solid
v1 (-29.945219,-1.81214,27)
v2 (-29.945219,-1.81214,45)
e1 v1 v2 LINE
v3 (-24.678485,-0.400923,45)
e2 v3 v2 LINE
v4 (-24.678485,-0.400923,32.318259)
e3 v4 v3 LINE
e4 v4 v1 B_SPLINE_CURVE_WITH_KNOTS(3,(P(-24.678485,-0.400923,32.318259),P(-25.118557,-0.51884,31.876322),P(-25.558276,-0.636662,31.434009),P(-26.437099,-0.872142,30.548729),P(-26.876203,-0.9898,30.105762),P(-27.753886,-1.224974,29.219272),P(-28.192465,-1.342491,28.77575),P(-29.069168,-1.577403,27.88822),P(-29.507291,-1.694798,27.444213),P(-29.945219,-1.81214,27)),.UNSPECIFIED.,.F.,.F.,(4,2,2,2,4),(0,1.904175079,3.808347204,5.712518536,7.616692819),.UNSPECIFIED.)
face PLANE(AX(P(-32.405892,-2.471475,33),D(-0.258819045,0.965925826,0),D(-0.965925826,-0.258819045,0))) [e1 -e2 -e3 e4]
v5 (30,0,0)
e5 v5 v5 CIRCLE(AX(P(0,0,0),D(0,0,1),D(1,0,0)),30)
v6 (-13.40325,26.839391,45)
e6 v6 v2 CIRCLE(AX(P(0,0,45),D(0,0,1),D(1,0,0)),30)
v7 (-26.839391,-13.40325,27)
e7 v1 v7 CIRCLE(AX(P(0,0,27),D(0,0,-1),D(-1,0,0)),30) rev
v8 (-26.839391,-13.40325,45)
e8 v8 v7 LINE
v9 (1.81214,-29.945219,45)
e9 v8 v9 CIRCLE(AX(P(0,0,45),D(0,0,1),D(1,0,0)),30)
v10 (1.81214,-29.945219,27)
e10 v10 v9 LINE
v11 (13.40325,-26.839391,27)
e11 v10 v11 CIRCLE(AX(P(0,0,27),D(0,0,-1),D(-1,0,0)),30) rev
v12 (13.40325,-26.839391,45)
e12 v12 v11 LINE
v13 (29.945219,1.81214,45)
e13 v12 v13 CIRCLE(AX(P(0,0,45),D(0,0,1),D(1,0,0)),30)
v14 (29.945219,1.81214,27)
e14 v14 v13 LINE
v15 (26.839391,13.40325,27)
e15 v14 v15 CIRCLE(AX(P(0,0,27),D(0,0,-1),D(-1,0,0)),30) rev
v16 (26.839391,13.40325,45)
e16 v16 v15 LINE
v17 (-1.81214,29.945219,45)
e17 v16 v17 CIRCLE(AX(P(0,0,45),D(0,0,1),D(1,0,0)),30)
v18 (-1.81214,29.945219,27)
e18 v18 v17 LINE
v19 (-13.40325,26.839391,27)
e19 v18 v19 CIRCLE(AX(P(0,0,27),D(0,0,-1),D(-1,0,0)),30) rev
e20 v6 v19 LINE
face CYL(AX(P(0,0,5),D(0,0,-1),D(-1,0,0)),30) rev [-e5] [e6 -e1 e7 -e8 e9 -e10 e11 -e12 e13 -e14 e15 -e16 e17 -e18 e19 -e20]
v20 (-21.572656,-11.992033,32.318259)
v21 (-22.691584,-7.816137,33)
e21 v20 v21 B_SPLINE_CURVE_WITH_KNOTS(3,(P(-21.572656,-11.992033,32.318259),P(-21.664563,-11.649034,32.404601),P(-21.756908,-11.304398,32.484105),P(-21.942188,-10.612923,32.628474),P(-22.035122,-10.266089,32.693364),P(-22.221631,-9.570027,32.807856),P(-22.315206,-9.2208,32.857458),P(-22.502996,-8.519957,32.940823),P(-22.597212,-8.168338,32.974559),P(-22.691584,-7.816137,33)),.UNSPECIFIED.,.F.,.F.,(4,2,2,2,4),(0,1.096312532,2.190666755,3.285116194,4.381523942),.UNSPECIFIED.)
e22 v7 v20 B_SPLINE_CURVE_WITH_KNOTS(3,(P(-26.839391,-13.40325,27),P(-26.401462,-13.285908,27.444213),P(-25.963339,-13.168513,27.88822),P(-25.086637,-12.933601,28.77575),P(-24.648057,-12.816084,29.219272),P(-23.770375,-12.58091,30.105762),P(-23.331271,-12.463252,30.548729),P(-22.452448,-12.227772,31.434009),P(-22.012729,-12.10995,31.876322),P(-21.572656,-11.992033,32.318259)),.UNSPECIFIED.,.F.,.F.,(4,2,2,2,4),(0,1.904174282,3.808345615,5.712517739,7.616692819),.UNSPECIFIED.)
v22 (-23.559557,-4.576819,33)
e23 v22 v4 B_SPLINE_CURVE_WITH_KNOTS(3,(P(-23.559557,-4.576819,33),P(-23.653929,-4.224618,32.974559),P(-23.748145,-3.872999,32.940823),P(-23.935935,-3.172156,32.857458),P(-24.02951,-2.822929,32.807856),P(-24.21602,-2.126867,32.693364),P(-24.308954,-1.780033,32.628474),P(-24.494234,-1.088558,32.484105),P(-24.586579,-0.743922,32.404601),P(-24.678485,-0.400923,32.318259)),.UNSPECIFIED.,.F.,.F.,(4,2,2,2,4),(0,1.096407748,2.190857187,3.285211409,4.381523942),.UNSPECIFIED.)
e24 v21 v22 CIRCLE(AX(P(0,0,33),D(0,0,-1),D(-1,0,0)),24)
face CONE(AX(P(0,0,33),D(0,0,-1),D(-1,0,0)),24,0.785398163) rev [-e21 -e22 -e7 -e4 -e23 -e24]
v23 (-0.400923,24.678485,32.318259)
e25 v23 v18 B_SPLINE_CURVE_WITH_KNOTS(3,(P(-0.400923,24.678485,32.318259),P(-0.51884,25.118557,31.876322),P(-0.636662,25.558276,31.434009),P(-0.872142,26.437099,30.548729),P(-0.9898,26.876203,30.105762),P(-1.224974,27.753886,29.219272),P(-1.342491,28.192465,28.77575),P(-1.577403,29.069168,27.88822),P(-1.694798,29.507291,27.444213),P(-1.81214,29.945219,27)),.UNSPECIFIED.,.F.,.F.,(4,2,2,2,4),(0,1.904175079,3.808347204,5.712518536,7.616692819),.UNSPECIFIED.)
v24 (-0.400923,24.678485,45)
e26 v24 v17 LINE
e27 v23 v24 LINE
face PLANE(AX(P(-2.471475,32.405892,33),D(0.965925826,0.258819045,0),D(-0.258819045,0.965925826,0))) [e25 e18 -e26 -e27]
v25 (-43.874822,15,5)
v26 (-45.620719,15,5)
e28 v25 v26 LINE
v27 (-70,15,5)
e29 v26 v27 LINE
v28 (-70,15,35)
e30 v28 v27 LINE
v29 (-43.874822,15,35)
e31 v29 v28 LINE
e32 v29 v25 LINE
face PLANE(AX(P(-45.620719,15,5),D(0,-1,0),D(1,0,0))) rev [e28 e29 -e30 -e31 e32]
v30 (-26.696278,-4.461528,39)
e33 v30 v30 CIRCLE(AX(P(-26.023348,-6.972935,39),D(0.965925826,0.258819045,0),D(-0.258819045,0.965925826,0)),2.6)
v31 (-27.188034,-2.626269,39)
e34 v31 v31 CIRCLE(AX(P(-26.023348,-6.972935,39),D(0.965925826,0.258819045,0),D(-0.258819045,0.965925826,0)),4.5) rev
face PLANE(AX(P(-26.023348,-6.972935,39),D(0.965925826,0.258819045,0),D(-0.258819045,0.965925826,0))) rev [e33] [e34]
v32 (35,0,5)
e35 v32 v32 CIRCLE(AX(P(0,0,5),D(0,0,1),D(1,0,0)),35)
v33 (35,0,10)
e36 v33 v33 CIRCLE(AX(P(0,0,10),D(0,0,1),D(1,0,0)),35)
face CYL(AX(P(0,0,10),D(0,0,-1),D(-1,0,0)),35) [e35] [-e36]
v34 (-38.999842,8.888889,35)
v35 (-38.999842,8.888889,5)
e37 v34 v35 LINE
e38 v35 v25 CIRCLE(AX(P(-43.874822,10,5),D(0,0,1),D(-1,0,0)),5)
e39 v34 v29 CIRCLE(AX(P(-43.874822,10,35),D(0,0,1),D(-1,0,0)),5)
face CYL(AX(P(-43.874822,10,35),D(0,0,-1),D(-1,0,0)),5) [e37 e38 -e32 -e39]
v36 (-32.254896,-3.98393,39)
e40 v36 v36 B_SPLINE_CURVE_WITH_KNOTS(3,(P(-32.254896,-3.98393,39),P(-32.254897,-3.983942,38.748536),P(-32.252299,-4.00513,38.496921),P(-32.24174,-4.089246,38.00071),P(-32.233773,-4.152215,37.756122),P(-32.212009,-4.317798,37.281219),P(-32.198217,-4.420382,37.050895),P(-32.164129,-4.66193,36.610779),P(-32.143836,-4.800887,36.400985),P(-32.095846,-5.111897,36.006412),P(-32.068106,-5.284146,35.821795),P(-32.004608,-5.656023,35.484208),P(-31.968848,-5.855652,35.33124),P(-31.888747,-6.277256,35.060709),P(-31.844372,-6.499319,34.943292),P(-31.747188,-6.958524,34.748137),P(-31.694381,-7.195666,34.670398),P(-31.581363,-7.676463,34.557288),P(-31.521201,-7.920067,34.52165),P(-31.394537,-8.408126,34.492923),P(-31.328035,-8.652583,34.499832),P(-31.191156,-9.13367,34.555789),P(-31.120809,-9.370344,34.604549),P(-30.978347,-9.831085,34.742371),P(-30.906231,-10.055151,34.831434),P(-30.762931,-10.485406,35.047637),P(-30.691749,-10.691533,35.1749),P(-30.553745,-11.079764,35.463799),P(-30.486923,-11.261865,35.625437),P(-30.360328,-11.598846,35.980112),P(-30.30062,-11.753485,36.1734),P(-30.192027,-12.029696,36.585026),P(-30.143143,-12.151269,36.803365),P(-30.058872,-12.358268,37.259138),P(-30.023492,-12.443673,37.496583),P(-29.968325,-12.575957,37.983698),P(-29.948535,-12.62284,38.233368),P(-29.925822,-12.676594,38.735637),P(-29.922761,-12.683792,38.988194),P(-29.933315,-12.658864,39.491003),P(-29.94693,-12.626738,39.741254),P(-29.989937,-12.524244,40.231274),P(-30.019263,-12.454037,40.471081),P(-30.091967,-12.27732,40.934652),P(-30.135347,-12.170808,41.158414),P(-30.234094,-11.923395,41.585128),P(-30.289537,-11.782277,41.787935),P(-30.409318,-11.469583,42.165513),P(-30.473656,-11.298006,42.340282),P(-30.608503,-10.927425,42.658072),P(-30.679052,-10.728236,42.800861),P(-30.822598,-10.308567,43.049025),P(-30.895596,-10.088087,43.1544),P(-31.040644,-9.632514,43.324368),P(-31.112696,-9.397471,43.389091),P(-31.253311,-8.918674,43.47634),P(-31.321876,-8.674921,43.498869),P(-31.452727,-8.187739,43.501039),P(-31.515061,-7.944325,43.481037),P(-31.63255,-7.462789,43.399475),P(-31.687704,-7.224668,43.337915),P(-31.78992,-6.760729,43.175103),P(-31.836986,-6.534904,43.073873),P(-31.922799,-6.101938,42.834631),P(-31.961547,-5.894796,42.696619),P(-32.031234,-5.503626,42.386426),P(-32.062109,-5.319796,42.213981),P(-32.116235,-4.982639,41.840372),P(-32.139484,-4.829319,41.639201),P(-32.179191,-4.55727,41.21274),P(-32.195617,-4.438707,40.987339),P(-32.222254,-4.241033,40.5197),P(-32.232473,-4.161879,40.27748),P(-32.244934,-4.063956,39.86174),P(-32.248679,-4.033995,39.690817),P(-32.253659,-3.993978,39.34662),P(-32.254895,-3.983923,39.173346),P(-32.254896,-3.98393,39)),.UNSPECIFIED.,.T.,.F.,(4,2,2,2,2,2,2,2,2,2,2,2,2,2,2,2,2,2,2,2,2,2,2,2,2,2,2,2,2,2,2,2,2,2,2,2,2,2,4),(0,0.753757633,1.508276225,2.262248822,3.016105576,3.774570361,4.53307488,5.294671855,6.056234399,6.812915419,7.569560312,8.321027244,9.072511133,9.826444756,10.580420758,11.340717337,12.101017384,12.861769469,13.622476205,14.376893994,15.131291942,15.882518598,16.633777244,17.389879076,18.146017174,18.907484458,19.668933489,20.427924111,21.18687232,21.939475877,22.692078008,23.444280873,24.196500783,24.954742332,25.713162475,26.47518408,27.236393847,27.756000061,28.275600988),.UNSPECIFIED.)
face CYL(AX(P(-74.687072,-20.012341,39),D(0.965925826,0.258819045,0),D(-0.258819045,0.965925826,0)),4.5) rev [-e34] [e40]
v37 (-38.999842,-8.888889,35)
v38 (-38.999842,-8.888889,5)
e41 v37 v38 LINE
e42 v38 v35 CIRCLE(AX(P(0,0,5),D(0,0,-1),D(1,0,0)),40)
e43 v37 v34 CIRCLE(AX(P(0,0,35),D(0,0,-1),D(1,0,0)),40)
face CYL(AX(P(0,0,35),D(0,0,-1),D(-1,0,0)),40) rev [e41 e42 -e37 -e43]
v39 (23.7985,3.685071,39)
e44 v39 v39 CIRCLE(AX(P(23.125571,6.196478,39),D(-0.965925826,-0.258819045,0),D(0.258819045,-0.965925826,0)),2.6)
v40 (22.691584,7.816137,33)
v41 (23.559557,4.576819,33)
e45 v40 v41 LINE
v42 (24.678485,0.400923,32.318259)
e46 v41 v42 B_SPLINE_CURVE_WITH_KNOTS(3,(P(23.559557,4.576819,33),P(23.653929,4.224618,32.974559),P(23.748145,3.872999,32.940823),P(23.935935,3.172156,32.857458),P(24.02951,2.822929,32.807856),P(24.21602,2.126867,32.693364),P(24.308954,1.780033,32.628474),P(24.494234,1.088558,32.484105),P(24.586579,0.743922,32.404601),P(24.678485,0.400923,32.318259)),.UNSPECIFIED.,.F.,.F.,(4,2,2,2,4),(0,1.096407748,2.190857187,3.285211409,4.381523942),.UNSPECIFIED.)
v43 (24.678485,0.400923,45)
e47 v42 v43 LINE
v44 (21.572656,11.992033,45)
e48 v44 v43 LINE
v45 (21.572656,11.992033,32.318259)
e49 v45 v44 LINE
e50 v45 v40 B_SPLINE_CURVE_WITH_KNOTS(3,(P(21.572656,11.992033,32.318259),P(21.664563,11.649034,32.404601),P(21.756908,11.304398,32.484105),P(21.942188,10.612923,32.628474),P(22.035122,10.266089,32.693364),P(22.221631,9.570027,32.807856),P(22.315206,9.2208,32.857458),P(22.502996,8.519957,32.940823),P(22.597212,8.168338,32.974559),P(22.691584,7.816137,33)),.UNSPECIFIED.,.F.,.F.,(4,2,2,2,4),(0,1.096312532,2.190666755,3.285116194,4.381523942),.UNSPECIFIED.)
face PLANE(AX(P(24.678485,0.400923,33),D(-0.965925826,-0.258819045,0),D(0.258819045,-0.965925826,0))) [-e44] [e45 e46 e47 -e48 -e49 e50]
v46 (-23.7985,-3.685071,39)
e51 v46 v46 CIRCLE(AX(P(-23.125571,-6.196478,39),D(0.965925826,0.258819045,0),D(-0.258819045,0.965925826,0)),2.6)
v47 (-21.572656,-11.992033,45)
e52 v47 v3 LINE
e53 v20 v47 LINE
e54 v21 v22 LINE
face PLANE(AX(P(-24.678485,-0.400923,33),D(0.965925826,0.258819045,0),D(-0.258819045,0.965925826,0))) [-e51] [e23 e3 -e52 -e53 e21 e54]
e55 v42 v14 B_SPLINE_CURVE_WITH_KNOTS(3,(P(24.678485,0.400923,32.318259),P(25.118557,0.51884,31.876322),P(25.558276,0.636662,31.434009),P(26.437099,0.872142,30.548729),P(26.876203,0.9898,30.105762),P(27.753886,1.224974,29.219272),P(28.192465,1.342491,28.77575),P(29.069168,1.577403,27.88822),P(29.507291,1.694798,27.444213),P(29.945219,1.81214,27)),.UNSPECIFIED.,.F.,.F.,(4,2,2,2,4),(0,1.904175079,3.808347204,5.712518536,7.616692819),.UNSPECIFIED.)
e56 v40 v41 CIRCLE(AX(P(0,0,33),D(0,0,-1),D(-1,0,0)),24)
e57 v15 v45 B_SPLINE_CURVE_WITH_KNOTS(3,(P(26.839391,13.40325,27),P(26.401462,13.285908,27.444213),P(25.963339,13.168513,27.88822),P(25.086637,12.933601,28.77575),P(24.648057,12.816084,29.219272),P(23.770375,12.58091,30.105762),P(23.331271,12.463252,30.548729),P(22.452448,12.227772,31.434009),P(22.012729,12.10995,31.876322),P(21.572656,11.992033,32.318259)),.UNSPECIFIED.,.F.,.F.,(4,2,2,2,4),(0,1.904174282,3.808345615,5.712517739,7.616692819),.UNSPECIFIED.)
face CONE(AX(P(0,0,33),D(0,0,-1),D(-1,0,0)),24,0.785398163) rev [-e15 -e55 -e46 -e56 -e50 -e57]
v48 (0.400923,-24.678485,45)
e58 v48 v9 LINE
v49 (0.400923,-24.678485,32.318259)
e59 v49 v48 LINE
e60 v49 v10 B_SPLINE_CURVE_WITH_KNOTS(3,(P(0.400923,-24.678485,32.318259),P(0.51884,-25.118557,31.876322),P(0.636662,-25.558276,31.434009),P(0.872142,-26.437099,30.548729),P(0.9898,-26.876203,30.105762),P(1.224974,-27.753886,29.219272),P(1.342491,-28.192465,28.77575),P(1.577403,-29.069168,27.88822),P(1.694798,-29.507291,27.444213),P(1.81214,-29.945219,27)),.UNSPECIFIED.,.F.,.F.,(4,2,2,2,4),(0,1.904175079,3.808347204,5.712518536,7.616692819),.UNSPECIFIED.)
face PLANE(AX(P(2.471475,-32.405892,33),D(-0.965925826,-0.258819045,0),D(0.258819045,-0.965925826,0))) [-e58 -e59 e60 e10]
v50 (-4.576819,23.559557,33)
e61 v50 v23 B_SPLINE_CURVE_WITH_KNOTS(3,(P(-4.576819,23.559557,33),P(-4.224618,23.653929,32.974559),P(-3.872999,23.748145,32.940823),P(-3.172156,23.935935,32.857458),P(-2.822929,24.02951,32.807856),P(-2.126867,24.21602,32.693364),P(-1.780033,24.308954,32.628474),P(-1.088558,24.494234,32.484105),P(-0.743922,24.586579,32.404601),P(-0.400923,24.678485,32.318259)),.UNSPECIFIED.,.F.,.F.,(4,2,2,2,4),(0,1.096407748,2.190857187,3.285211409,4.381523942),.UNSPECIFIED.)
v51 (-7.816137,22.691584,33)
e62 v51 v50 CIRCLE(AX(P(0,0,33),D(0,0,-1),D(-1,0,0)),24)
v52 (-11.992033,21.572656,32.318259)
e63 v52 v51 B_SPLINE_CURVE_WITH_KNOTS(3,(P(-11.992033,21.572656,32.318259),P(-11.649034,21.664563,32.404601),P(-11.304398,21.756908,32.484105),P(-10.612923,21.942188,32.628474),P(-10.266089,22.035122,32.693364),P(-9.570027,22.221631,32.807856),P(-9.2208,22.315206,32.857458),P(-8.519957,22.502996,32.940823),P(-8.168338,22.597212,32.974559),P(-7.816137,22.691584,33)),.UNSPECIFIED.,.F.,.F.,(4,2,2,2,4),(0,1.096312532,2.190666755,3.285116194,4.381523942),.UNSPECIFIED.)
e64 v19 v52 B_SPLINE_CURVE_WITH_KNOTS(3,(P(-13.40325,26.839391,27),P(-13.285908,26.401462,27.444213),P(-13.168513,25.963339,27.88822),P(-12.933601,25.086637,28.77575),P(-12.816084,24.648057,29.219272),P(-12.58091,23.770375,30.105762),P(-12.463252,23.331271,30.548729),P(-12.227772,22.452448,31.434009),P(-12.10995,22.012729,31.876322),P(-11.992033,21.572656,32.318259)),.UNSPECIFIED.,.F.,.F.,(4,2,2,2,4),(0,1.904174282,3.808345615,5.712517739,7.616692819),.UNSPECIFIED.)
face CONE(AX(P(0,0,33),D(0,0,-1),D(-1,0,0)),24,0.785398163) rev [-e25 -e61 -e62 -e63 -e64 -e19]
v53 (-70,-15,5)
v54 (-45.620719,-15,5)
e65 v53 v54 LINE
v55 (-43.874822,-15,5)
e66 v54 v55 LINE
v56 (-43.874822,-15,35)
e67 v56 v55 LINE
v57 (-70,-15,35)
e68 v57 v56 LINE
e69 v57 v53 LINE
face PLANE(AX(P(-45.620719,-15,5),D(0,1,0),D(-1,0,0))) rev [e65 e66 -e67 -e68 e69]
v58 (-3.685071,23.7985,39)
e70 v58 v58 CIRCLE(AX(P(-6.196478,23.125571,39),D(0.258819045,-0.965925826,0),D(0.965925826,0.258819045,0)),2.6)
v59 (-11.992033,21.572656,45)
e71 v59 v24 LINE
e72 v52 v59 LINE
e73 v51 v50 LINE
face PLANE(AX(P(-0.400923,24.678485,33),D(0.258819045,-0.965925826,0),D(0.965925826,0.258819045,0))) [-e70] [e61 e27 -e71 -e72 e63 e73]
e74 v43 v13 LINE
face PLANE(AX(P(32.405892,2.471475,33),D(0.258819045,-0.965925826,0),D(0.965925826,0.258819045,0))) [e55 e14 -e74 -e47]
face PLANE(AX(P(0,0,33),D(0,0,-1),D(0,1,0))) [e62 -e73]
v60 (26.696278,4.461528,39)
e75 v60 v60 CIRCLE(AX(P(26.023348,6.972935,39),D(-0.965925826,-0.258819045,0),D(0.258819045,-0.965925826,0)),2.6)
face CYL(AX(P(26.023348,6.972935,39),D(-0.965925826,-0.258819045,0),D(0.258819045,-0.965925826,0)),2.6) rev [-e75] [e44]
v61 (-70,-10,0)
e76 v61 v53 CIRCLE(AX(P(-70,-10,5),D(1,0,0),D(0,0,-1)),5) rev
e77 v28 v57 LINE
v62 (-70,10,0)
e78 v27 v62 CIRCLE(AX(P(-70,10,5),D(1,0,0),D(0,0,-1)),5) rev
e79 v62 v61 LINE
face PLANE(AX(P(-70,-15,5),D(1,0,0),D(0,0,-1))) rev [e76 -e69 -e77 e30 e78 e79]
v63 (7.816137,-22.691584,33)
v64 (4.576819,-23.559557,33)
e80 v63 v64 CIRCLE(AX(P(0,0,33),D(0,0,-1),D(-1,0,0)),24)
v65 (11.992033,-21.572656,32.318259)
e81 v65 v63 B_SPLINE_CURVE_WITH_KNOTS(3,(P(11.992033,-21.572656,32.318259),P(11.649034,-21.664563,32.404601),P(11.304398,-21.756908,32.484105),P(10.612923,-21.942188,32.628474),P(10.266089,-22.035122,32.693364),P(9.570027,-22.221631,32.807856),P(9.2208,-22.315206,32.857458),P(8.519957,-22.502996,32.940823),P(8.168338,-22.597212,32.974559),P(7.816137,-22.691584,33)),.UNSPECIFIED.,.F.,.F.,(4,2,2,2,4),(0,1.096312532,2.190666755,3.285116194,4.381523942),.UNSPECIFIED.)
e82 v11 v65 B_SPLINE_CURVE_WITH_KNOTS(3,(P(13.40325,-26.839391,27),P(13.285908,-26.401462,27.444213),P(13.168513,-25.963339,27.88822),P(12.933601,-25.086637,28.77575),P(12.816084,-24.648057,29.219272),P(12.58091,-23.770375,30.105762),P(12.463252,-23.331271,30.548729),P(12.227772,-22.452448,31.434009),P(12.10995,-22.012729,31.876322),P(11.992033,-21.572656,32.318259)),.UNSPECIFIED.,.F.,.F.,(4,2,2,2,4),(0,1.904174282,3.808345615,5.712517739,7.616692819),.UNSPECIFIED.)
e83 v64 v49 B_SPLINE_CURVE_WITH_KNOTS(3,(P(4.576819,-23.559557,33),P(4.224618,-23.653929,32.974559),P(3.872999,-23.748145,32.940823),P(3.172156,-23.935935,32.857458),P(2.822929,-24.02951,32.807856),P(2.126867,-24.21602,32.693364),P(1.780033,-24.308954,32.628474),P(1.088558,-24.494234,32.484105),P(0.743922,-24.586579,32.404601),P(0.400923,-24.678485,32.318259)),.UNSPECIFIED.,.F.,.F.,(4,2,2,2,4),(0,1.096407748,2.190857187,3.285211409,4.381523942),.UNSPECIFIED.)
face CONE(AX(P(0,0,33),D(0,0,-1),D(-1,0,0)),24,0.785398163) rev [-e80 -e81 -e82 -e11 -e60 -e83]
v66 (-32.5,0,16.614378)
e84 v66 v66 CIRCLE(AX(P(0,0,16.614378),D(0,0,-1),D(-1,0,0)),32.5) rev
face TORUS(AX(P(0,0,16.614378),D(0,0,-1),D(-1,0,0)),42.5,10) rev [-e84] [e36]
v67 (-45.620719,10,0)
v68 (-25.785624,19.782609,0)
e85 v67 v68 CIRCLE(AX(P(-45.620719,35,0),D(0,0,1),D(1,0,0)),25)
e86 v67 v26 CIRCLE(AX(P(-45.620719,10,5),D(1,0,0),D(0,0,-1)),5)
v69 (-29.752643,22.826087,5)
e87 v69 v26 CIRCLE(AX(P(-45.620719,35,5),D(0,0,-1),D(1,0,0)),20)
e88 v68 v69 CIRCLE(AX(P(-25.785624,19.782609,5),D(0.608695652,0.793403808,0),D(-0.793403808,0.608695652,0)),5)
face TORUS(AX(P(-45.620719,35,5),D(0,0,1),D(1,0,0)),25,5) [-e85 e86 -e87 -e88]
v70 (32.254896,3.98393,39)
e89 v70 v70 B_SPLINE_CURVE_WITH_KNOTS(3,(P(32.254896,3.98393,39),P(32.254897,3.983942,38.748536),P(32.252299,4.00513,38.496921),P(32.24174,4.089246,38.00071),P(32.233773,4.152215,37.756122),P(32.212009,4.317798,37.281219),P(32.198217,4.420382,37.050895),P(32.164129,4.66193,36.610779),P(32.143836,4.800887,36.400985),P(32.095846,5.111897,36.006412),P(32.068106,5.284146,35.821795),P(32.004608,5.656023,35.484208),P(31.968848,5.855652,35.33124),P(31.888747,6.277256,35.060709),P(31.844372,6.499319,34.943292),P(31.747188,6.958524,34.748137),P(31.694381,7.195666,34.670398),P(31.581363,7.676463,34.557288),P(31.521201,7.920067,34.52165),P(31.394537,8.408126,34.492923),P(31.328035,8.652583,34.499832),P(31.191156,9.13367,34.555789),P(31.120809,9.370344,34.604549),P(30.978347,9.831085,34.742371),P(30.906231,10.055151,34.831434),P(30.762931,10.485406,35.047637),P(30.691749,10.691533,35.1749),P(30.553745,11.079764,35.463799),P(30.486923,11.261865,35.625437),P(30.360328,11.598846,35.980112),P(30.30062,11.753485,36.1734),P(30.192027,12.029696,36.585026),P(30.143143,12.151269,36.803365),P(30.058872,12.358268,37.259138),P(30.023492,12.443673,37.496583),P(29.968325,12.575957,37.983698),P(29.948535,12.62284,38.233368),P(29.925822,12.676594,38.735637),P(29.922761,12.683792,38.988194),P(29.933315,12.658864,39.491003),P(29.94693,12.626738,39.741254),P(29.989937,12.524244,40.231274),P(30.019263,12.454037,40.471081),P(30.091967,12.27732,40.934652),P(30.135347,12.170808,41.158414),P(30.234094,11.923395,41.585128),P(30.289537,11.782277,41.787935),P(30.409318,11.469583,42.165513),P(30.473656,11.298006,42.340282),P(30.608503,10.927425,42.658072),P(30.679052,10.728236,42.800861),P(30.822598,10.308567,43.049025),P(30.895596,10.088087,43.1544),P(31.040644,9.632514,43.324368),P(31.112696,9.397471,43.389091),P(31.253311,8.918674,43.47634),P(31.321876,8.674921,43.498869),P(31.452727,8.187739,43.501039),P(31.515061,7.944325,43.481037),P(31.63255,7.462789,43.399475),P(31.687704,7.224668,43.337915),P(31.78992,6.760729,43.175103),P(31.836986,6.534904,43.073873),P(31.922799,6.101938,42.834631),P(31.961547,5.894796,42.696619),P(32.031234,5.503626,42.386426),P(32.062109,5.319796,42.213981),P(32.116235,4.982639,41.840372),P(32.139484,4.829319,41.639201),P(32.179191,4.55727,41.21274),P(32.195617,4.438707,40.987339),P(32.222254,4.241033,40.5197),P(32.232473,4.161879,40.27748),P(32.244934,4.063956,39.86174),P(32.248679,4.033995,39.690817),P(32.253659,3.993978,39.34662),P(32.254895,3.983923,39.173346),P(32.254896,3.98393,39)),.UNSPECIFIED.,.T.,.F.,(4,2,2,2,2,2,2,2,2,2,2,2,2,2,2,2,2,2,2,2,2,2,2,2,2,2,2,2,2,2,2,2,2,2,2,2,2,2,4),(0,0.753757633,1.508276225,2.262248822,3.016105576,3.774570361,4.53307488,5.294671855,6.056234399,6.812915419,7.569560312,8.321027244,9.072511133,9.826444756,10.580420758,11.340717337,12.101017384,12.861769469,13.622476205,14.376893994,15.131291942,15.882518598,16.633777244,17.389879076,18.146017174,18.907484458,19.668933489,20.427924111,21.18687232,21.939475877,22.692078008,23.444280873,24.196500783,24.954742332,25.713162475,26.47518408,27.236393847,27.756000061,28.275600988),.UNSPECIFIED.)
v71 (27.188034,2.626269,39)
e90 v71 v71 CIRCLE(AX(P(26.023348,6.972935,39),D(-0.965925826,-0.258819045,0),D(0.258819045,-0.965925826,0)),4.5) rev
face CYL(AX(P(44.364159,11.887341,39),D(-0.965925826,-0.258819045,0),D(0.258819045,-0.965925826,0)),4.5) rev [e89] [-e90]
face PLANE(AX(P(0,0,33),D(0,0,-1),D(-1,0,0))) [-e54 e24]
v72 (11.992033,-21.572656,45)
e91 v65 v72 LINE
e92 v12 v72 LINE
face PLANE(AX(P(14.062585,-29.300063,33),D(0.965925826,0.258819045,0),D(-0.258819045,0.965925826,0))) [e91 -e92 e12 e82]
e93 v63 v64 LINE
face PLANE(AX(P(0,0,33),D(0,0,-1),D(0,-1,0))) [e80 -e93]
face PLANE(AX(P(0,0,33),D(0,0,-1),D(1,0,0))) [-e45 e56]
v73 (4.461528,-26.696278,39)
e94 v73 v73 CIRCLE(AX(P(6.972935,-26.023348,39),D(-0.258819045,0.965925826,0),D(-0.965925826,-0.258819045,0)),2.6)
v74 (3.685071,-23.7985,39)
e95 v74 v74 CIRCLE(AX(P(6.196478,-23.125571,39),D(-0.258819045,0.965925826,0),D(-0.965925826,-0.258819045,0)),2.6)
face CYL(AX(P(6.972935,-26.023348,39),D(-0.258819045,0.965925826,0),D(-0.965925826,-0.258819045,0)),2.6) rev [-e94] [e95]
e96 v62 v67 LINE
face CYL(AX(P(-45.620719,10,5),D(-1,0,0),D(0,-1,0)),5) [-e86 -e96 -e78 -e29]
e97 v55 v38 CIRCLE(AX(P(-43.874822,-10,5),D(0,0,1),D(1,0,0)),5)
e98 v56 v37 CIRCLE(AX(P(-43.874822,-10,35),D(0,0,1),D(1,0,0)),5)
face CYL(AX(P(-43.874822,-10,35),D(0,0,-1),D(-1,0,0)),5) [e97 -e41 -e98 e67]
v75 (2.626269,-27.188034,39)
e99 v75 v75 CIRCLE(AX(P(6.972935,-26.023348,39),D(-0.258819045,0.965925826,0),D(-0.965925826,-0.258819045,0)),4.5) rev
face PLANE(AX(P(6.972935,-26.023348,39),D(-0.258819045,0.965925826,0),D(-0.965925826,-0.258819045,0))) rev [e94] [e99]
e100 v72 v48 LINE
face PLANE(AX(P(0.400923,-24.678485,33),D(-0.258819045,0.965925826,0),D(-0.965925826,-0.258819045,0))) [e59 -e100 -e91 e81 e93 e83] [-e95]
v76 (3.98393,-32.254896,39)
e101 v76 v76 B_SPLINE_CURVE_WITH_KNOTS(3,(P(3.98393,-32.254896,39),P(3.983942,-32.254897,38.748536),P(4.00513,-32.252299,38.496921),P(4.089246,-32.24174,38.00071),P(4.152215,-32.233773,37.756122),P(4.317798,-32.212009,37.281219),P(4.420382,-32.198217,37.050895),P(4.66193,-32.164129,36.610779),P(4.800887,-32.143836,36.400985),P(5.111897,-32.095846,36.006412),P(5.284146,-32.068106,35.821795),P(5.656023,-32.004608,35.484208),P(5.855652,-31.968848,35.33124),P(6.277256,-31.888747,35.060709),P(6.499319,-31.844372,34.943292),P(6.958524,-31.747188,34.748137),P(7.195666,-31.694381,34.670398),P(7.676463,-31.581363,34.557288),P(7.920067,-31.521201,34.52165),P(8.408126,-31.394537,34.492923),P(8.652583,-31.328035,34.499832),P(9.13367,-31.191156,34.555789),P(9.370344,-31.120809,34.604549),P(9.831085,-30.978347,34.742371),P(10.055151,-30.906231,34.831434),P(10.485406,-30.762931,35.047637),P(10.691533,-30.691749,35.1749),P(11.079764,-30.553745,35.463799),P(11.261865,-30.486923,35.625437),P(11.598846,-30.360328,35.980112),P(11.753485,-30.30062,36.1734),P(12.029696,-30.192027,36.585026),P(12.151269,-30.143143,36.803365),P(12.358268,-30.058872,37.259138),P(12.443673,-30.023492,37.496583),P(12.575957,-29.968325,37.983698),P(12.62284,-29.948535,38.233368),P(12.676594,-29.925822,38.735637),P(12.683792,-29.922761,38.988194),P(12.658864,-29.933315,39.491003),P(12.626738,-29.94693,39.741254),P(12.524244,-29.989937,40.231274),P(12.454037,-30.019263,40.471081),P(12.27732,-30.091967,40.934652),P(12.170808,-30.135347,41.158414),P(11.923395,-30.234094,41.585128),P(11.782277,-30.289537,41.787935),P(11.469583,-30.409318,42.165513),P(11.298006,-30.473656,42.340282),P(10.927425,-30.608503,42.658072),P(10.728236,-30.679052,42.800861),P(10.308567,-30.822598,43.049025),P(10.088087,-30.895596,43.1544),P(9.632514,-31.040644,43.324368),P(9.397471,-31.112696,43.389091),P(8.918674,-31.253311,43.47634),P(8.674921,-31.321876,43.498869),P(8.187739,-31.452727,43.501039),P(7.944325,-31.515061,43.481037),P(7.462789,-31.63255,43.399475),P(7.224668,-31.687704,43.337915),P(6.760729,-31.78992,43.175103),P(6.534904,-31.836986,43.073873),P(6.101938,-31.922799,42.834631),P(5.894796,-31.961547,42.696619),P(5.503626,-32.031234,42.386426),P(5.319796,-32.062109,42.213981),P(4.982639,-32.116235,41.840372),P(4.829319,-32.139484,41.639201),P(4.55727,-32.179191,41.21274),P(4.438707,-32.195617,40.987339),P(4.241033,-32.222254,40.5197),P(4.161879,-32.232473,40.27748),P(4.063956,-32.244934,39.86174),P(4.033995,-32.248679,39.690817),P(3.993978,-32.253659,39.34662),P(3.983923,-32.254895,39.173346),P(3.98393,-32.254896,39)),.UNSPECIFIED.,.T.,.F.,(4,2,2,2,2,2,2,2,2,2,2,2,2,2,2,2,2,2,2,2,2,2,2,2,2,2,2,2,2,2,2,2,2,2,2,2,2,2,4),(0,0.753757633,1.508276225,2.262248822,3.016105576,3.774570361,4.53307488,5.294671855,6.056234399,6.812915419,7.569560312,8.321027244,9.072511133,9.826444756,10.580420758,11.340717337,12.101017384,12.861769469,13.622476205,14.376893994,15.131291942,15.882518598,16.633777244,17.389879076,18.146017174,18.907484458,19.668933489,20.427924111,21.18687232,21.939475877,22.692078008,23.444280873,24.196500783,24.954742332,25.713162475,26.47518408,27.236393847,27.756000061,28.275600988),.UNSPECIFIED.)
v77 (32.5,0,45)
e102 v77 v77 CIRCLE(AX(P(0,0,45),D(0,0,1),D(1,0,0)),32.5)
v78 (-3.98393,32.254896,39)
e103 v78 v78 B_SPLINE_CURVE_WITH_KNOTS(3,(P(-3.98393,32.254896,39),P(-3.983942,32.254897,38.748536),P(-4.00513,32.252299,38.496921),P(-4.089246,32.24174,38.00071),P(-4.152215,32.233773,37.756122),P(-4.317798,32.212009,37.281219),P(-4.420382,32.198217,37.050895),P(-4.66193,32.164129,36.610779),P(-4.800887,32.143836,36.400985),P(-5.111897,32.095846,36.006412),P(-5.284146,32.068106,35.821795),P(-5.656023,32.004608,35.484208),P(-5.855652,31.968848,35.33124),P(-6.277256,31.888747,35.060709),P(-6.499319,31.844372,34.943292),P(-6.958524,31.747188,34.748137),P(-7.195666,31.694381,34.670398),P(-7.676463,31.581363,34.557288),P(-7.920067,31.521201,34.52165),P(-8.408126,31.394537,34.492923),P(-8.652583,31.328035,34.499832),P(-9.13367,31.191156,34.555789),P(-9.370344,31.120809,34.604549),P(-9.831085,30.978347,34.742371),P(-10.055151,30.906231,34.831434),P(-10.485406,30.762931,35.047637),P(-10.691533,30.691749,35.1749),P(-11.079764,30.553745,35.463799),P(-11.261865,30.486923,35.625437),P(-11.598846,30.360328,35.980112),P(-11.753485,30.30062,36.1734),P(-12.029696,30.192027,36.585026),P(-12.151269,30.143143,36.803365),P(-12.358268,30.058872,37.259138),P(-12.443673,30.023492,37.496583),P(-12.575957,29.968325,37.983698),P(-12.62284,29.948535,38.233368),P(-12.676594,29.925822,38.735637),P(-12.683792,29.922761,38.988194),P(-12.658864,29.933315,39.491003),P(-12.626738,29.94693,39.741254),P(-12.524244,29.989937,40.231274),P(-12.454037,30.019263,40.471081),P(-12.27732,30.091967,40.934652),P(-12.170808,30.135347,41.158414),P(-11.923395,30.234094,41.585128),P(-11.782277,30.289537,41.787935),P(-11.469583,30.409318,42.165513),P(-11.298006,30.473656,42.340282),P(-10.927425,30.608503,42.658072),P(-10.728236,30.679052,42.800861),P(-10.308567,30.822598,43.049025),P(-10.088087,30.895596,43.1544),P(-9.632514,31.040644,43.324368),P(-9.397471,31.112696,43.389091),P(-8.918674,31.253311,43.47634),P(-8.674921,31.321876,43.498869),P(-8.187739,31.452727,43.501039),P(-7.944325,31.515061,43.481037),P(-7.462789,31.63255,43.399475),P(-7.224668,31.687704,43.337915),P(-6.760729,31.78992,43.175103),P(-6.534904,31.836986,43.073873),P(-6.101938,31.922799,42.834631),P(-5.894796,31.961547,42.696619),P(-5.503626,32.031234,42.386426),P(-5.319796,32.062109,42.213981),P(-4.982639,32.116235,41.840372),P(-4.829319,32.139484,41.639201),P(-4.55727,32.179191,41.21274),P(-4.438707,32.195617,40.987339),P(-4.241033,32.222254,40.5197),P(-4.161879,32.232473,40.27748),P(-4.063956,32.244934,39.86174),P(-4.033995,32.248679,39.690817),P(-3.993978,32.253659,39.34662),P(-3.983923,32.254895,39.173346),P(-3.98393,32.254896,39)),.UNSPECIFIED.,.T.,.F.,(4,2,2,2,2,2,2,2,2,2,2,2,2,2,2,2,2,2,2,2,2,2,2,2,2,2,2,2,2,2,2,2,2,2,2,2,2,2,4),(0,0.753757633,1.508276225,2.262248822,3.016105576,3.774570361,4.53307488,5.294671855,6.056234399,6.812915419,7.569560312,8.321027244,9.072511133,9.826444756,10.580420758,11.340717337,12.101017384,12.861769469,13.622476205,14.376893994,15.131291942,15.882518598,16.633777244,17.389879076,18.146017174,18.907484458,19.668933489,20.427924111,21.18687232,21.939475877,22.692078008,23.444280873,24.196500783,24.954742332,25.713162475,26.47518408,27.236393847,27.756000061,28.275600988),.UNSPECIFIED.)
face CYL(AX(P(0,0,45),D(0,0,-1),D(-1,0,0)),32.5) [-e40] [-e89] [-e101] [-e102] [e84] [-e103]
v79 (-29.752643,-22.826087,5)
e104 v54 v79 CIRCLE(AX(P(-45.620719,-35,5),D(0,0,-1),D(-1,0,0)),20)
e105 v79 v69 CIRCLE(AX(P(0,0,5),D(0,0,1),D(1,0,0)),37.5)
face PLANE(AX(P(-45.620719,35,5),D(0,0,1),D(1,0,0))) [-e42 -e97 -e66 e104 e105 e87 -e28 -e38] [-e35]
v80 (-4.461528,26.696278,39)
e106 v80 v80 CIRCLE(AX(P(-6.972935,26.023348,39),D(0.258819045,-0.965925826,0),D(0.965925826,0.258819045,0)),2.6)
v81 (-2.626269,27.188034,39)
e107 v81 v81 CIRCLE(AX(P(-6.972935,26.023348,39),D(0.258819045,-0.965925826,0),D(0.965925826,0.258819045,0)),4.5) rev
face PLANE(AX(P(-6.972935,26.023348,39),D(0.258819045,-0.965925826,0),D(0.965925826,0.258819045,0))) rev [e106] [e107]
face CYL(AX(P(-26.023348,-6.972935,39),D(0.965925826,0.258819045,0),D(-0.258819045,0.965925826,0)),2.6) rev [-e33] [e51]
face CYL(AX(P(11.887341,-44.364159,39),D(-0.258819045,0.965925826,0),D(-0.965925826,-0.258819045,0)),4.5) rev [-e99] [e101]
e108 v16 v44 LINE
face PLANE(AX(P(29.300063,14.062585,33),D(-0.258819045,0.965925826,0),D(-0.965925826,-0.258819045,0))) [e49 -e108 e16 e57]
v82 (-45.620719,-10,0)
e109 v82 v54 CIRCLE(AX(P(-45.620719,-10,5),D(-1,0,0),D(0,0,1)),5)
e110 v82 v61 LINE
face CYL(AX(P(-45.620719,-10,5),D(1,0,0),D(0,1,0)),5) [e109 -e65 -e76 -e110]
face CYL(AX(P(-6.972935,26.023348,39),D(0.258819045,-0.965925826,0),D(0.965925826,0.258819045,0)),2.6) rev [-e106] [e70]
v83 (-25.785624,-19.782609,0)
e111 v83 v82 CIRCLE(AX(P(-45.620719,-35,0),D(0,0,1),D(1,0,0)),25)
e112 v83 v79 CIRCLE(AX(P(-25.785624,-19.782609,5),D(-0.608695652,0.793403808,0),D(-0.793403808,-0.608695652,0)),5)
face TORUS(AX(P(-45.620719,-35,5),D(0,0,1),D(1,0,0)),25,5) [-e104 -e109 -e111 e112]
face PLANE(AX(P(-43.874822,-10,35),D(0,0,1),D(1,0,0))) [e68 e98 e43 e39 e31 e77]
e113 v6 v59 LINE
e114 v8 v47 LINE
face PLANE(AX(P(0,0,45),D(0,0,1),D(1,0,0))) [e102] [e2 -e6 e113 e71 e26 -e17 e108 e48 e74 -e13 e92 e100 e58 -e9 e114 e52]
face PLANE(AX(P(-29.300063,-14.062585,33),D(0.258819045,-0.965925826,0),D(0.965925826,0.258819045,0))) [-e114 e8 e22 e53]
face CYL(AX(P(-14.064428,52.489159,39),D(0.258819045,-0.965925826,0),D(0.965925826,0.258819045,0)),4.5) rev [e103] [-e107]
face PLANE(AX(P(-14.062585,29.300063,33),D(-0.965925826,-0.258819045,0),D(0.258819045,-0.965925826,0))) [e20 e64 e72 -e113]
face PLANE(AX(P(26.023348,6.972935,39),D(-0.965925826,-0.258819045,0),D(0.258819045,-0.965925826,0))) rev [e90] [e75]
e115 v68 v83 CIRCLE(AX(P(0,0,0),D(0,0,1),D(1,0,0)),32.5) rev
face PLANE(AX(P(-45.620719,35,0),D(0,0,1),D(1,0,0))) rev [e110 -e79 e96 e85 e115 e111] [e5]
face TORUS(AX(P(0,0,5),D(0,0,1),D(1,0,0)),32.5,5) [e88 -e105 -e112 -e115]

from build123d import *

# Parameters (mm, degrees)
ESQUISSE1_R                               = 30
BOSS_EXTRU_1_DEPTH                        = 5
ESQUISSE6_R                               = 35
ESQUISSE6_R_2                             = 30
BOSS_EXTRU_6_DEPTH                        = 5
ESQUISSE7_R                               = 32.5
ESQUISSE7_R_2                             = 30
BOSS_EXTRU_8_DEPTH                        = 35
CONG_2_R                                  = 10
BOSS_EXTRU_9_DEPTH                        = 30
BOSS_EXTRU_10_DEPTH                       = 12
CHANFREIN1_SIZE                           = 6
CONG_3_R                                  = 5
ENL_V_MAT_EXTRU_1_REACH                   = 89.234
ENL_V_MAT_EXTRU_1_END_RADIUS              = 32.5
ESQUISSE10_R                              = 4.5
ESQUISSE11_R                              = 4.5
ESQUISSE11_R_2                            = 2.6
BOSS_EXTRU_11_DEPTH                       = 3
R_P_TITION_CIRCULAIRE1_COUNT              = 4
CHANFREIN1_OF_R_P_TITION_CIRCULAIRE1_SIZE = 6


# Some blends are built 0.0001 mm under size
with BuildPart() as part:
    # Esquisse1 → Boss.-Extru.1 (new body)
    with BuildSketch(Plane.XY):
        with BuildLine():
            Line((-45.620718977, 15), (-70, 15))
            Line((-70, 15), (-70, -15))
            Line((-70, -15), (-45.620718977, -15))
            ThreePointArc((-45.620718977, -15), (-36.774201608, -17.062911874), (-29.752642811, -22.826086957))
            ThreePointArc((-29.752642811, -22.826086957), (37.5, 0), (-29.752642811, 22.826086957))
            ThreePointArc((-29.752642811, 22.826086957), (-36.774201608, 17.062911874), (-45.620718977, 15))
        make_face()
        Circle(ESQUISSE1_R, mode=Mode.SUBTRACT)
    extrude(amount=BOSS_EXTRU_1_DEPTH)

    # Esquisse6 → Boss.-Extru.6 (add)
    with BuildSketch(Plane.XY.offset(5)):
        Circle(ESQUISSE6_R)
        Circle(ESQUISSE6_R_2, mode=Mode.SUBTRACT)
    extrude(amount=BOSS_EXTRU_6_DEPTH)

    # Esquisse7 → Boss.-Extru.8 (add)
    with BuildSketch(Plane.XY.offset(10)):
        Circle(ESQUISSE7_R)
        Circle(ESQUISSE7_R_2, mode=Mode.SUBTRACT)
    extrude(amount=BOSS_EXTRU_8_DEPTH)

    # Congé2
    # the kernel refuses this fillet: 10 mm, written as the material it adds along each edge
    with BuildSketch(Plane(origin=(0, 0, 10), x_dir=(1, 0, 0), z_dir=(0, -1, 0))) as cong_2_piece_1:
        with BuildLine():
            CenterArc((42.5, 6.614378278), CONG_2_R, 180, 41.409622109)
            Line((32.5, 6.614378278), (32.3, 6.614378278))
            Line((32.3, 6.614378278), (32.3, 0))
            Line((32.3, 0), (32.5, -0.2))
            ThreePointArc((32.5, -0.2), (33.75, -0.2), (34.85, -0.132287566))
            Line((34.85, -0.132287566), (35, 0))
        make_face()
    revolve(axis=Axis((0, 0, 10), (0, 0, 1)))

    # Esquisse8 → Boss.-Extru.9 (add)
    with BuildSketch(Plane.XY.offset(5)):
        with BuildLine():
            Line((-70, -15), (-70, 15))
            Line((-70, 15), (-43.874821937, 15))
            ThreePointArc((-43.874821937, 15), (-39.966142137, 13.118047822), (-38.999841722, 8.888888889))
            ThreePointArc((-38.999841722, 8.888888889), (-40, 0), (-38.999841722, -8.888888889))
            ThreePointArc((-38.999841722, -8.888888889), (-39.966142137, -13.118047822), (-43.874821937, -15))
            Line((-43.874821937, -15), (-70, -15))
        make_face()
    extrude(amount=BOSS_EXTRU_9_DEPTH)

    # Esquisse9 → Boss.-Extru.10 (add)
    with BuildSketch(Plane.XY.offset(45)):
        Polygon((-32.405891584, -2.471475398), (-29.300063043, -14.062585313), (-21.572656433, -11.992032952), (-24.678484974, -0.400923037), align=None)
    boss_extru_10 = extrude(amount=-BOSS_EXTRU_10_DEPTH)

    # Chanfrein1
    # the kernel refuses this chamfer: 6 mm, written as the material it adds along each edge
    with BuildSketch(Plane(origin=(0, 0, 33), x_dir=(-0.5590908430517356, -0.8291064040373223, 0), z_dir=(0.8291064040373223, -0.5590908430517356, 0))) as chanfrein1_piece_1_section:
        Polygon((30, CHANFREIN1_SIZE), (30 - CHANFREIN1_SIZE, 0), (30, 0), align=None)
    chanfrein1_piece_1 = revolve(axis=Axis((0, 0, 33), (0, 0, -1)), revolution_arc=82.01410645, mode=Mode.PRIVATE)
    chanfrein1_piece_1 = split(chanfrein1_piece_1, bisect_by=Plane(origin=(-25.327272202, -12.998079215, 31.008979001), z_dir=(-0.25881904510251486, 0.96592582628907, 0)), keep=Keep.TOP, mode=Mode.PRIVATE)
    chanfrein1_piece_1 = split(chanfrein1_piece_1, bisect_by=Plane(origin=(-28.433100743, -1.4069693, 31.008979001), z_dir=(0.2588190451025147, -0.96592582628907, 0)), keep=Keep.TOP, mode=Mode.PRIVATE)
    chanfrein1_piece_1 = split(chanfrein1_piece_1, bisect_by=Plane(origin=(-23.125570703, -6.196477994, 31.008979001), z_dir=(-0.9659258262890699, -0.2588190451025148, 0)), keep=Keep.TOP, mode=Mode.PRIVATE)
    add(chanfrein1_piece_1)

    # Congé3
    cong_3_edges = [part.edges().sort_by_distance(p)[0] for p in [
        (37.5, 0, 0),
        (-57.810359489, 15, 0),
        (-57.810359489, -15, 0),
        (-36.774201608, -17.062911874, 0),
        (-36.774201608, 17.062911874, 0),
    ]]
    fillet(cong_3_edges, radius=CONG_3_R - 0.0001)  # a hair under: the kernel refuses the full size

    # Enlèv. mat.-Extru.1: up to this cylinder (the profile starts inside it)
    enl_v_mat_extru_1_end = Plane(origin=(0, 0, 39), z_dir=(0, 0, -1)) * Cylinder(ENL_V_MAT_EXTRU_1_END_RADIUS, 244.468, mode=Mode.PRIVATE)
    # Esquisse10 → Enlèv. mat.-Extru.1 (cut, up to the surface)
    with BuildSketch(Plane(origin=(-23.125570703, -6.196477994, 0), x_dir=(0, 0, -1), z_dir=(0.96592582628907, 0.25881904510251497, 0)), mode=Mode.PRIVATE) as enl_v_mat_extru_1_sk1:
        with Locations(Location((-39, 0, 0), (0, 0, 90))):
            Circle(ESQUISSE10_R)
    enl_v_mat_extru_1_tool1 = extrude(enl_v_mat_extru_1_sk1.sketch, amount=-ENL_V_MAT_EXTRU_1_REACH, mode=Mode.PRIVATE) & enl_v_mat_extru_1_end
    enl_v_mat_extru_1 = enl_v_mat_extru_1_tool1.solids().sort_by_distance((-23.125571, -6.196478, 39))[0]
    add(enl_v_mat_extru_1, mode=Mode.SUBTRACT)

    # Esquisse11 → Boss.-Extru.11 (add)
    with BuildSketch(Plane(origin=(-23.125570703, -6.196477994, 0), x_dir=(0, 0, -1), z_dir=(0.96592582628907, 0.25881904510251497, 0))):
        with Locations(Location((-39, 0, 0), (0, 0, 90))):
            Circle(ESQUISSE11_R)
        with Locations(Location((-39, 0, 0), (0, 0, 90))):
            Circle(ESQUISSE11_R_2, mode=Mode.SUBTRACT)
    boss_extru_11 = extrude(amount=-BOSS_EXTRU_11_DEPTH)

    # Répétition circulaire1: Boss.-Extru.10, Enlèv. mat.-Extru.1, Boss.-Extru.11 ×4 about axis
    r_p_tition_circulaire1_axis = Axis((0, 0, 0), (0, 0, 1))
    add([boss_extru_10.rotate(r_p_tition_circulaire1_axis, i * 360 / R_P_TITION_CIRCULAIRE1_COUNT) for i in range(1, R_P_TITION_CIRCULAIRE1_COUNT)])
    add([enl_v_mat_extru_1.rotate(r_p_tition_circulaire1_axis, i * 360 / R_P_TITION_CIRCULAIRE1_COUNT) for i in range(1, R_P_TITION_CIRCULAIRE1_COUNT)], mode=Mode.SUBTRACT)
    add([boss_extru_11.rotate(r_p_tition_circulaire1_axis, i * 360 / R_P_TITION_CIRCULAIRE1_COUNT) for i in range(1, R_P_TITION_CIRCULAIRE1_COUNT)])

    # Chanfrein1 of Répétition circulaire1
    # the kernel refuses this chamfer: 6 mm, written as the material it adds along each edge
    with BuildSketch(Plane(origin=(0, 0, 33), x_dir=(0.8291064040373222, -0.559090843051736, 0), z_dir=(0.559090843051736, 0.8291064040373222, 0))) as chanfrein1_of_r_p_tition_circulaire1_piece_1_section:
        Polygon((30, CHANFREIN1_OF_R_P_TITION_CIRCULAIRE1_SIZE), (30 - CHANFREIN1_OF_R_P_TITION_CIRCULAIRE1_SIZE, 0), (30, 0), align=None)
    chanfrein1_of_r_p_tition_circulaire1_piece_1 = revolve(axis=Axis((0, 0, 33), (0, 0, -1)), revolution_arc=82.01410645, mode=Mode.PRIVATE)
    chanfrein1_of_r_p_tition_circulaire1_piece_1 = split(chanfrein1_of_r_p_tition_circulaire1_piece_1, bisect_by=Plane(origin=(12.998079215, -25.327272202, 31.008979001), z_dir=(-0.96592582628907, -0.25881904510251474, 0)), keep=Keep.TOP, mode=Mode.PRIVATE)
    chanfrein1_of_r_p_tition_circulaire1_piece_1 = split(chanfrein1_of_r_p_tition_circulaire1_piece_1, bisect_by=Plane(origin=(1.4069693, -28.433100743, 31.008979001), z_dir=(0.96592582628907, 0.2588190451025146, 0)), keep=Keep.TOP, mode=Mode.PRIVATE)
    chanfrein1_of_r_p_tition_circulaire1_piece_1 = split(chanfrein1_of_r_p_tition_circulaire1_piece_1, bisect_by=Plane(origin=(6.196477994, -23.125570703, 31.008979001), z_dir=(0.25881904510251474, -0.9659258262890701, 0)), keep=Keep.TOP, mode=Mode.PRIVATE)
    add(chanfrein1_of_r_p_tition_circulaire1_piece_1)
    with BuildSketch(Plane(origin=(0, 0, 33), x_dir=(0.5590908430517355, 0.8291064040373223, 0), z_dir=(-0.8291064040373223, 0.5590908430517355, 0))) as chanfrein1_of_r_p_tition_circulaire1_piece_2_section:
        Polygon((30, CHANFREIN1_OF_R_P_TITION_CIRCULAIRE1_SIZE), (30 - CHANFREIN1_OF_R_P_TITION_CIRCULAIRE1_SIZE, 0), (30, 0), align=None)
    chanfrein1_of_r_p_tition_circulaire1_piece_2 = revolve(axis=Axis((0, 0, 33), (0, 0, -1)), revolution_arc=82.01410645, mode=Mode.PRIVATE)
    chanfrein1_of_r_p_tition_circulaire1_piece_2 = split(chanfrein1_of_r_p_tition_circulaire1_piece_2, bisect_by=Plane(origin=(25.327272202, 12.998079215, 31.008979001), z_dir=(0.25881904510251474, -0.96592582628907, 0)), keep=Keep.TOP, mode=Mode.PRIVATE)
    chanfrein1_of_r_p_tition_circulaire1_piece_2 = split(chanfrein1_of_r_p_tition_circulaire1_piece_2, bisect_by=Plane(origin=(28.433100743, 1.4069693, 31.008979001), z_dir=(-0.2588190451025146, 0.96592582628907, 0)), keep=Keep.TOP, mode=Mode.PRIVATE)
    chanfrein1_of_r_p_tition_circulaire1_piece_2 = split(chanfrein1_of_r_p_tition_circulaire1_piece_2, bisect_by=Plane(origin=(23.125570703, 6.196477994, 31.008979001), z_dir=(0.9659258262890701, 0.25881904510251474, 0)), keep=Keep.TOP, mode=Mode.PRIVATE)
    add(chanfrein1_of_r_p_tition_circulaire1_piece_2)
    with BuildSketch(Plane(origin=(0, 0, 33), x_dir=(-0.8291064040373223, 0.5590908430517356, 0), z_dir=(-0.5590908430517356, -0.8291064040373223, 0))) as chanfrein1_of_r_p_tition_circulaire1_piece_3_section:
        Polygon((30, CHANFREIN1_OF_R_P_TITION_CIRCULAIRE1_SIZE), (30 - CHANFREIN1_OF_R_P_TITION_CIRCULAIRE1_SIZE, 0), (30, 0), align=None)
    chanfrein1_of_r_p_tition_circulaire1_piece_3 = revolve(axis=Axis((0, 0, 33), (0, 0, -1)), revolution_arc=82.01410645, mode=Mode.PRIVATE)
    chanfrein1_of_r_p_tition_circulaire1_piece_3 = split(chanfrein1_of_r_p_tition_circulaire1_piece_3, bisect_by=Plane(origin=(-12.998079215, 25.327272202, 31.008979001), z_dir=(0.9659258262890701, 0.25881904510251463, 0)), keep=Keep.TOP, mode=Mode.PRIVATE)
    chanfrein1_of_r_p_tition_circulaire1_piece_3 = split(chanfrein1_of_r_p_tition_circulaire1_piece_3, bisect_by=Plane(origin=(-1.4069693, 28.433100743, 31.008979001), z_dir=(-0.9659258262890701, -0.25881904510251447, 0)), keep=Keep.TOP, mode=Mode.PRIVATE)
    chanfrein1_of_r_p_tition_circulaire1_piece_3 = split(chanfrein1_of_r_p_tition_circulaire1_piece_3, bisect_by=Plane(origin=(-6.196477994, 23.125570703, 31.008979001), z_dir=(-0.2588190451025146, 0.96592582628907, 0)), keep=Keep.TOP, mode=Mode.PRIVATE)
    add(chanfrein1_of_r_p_tition_circulaire1_piece_3)


solid = part.part
